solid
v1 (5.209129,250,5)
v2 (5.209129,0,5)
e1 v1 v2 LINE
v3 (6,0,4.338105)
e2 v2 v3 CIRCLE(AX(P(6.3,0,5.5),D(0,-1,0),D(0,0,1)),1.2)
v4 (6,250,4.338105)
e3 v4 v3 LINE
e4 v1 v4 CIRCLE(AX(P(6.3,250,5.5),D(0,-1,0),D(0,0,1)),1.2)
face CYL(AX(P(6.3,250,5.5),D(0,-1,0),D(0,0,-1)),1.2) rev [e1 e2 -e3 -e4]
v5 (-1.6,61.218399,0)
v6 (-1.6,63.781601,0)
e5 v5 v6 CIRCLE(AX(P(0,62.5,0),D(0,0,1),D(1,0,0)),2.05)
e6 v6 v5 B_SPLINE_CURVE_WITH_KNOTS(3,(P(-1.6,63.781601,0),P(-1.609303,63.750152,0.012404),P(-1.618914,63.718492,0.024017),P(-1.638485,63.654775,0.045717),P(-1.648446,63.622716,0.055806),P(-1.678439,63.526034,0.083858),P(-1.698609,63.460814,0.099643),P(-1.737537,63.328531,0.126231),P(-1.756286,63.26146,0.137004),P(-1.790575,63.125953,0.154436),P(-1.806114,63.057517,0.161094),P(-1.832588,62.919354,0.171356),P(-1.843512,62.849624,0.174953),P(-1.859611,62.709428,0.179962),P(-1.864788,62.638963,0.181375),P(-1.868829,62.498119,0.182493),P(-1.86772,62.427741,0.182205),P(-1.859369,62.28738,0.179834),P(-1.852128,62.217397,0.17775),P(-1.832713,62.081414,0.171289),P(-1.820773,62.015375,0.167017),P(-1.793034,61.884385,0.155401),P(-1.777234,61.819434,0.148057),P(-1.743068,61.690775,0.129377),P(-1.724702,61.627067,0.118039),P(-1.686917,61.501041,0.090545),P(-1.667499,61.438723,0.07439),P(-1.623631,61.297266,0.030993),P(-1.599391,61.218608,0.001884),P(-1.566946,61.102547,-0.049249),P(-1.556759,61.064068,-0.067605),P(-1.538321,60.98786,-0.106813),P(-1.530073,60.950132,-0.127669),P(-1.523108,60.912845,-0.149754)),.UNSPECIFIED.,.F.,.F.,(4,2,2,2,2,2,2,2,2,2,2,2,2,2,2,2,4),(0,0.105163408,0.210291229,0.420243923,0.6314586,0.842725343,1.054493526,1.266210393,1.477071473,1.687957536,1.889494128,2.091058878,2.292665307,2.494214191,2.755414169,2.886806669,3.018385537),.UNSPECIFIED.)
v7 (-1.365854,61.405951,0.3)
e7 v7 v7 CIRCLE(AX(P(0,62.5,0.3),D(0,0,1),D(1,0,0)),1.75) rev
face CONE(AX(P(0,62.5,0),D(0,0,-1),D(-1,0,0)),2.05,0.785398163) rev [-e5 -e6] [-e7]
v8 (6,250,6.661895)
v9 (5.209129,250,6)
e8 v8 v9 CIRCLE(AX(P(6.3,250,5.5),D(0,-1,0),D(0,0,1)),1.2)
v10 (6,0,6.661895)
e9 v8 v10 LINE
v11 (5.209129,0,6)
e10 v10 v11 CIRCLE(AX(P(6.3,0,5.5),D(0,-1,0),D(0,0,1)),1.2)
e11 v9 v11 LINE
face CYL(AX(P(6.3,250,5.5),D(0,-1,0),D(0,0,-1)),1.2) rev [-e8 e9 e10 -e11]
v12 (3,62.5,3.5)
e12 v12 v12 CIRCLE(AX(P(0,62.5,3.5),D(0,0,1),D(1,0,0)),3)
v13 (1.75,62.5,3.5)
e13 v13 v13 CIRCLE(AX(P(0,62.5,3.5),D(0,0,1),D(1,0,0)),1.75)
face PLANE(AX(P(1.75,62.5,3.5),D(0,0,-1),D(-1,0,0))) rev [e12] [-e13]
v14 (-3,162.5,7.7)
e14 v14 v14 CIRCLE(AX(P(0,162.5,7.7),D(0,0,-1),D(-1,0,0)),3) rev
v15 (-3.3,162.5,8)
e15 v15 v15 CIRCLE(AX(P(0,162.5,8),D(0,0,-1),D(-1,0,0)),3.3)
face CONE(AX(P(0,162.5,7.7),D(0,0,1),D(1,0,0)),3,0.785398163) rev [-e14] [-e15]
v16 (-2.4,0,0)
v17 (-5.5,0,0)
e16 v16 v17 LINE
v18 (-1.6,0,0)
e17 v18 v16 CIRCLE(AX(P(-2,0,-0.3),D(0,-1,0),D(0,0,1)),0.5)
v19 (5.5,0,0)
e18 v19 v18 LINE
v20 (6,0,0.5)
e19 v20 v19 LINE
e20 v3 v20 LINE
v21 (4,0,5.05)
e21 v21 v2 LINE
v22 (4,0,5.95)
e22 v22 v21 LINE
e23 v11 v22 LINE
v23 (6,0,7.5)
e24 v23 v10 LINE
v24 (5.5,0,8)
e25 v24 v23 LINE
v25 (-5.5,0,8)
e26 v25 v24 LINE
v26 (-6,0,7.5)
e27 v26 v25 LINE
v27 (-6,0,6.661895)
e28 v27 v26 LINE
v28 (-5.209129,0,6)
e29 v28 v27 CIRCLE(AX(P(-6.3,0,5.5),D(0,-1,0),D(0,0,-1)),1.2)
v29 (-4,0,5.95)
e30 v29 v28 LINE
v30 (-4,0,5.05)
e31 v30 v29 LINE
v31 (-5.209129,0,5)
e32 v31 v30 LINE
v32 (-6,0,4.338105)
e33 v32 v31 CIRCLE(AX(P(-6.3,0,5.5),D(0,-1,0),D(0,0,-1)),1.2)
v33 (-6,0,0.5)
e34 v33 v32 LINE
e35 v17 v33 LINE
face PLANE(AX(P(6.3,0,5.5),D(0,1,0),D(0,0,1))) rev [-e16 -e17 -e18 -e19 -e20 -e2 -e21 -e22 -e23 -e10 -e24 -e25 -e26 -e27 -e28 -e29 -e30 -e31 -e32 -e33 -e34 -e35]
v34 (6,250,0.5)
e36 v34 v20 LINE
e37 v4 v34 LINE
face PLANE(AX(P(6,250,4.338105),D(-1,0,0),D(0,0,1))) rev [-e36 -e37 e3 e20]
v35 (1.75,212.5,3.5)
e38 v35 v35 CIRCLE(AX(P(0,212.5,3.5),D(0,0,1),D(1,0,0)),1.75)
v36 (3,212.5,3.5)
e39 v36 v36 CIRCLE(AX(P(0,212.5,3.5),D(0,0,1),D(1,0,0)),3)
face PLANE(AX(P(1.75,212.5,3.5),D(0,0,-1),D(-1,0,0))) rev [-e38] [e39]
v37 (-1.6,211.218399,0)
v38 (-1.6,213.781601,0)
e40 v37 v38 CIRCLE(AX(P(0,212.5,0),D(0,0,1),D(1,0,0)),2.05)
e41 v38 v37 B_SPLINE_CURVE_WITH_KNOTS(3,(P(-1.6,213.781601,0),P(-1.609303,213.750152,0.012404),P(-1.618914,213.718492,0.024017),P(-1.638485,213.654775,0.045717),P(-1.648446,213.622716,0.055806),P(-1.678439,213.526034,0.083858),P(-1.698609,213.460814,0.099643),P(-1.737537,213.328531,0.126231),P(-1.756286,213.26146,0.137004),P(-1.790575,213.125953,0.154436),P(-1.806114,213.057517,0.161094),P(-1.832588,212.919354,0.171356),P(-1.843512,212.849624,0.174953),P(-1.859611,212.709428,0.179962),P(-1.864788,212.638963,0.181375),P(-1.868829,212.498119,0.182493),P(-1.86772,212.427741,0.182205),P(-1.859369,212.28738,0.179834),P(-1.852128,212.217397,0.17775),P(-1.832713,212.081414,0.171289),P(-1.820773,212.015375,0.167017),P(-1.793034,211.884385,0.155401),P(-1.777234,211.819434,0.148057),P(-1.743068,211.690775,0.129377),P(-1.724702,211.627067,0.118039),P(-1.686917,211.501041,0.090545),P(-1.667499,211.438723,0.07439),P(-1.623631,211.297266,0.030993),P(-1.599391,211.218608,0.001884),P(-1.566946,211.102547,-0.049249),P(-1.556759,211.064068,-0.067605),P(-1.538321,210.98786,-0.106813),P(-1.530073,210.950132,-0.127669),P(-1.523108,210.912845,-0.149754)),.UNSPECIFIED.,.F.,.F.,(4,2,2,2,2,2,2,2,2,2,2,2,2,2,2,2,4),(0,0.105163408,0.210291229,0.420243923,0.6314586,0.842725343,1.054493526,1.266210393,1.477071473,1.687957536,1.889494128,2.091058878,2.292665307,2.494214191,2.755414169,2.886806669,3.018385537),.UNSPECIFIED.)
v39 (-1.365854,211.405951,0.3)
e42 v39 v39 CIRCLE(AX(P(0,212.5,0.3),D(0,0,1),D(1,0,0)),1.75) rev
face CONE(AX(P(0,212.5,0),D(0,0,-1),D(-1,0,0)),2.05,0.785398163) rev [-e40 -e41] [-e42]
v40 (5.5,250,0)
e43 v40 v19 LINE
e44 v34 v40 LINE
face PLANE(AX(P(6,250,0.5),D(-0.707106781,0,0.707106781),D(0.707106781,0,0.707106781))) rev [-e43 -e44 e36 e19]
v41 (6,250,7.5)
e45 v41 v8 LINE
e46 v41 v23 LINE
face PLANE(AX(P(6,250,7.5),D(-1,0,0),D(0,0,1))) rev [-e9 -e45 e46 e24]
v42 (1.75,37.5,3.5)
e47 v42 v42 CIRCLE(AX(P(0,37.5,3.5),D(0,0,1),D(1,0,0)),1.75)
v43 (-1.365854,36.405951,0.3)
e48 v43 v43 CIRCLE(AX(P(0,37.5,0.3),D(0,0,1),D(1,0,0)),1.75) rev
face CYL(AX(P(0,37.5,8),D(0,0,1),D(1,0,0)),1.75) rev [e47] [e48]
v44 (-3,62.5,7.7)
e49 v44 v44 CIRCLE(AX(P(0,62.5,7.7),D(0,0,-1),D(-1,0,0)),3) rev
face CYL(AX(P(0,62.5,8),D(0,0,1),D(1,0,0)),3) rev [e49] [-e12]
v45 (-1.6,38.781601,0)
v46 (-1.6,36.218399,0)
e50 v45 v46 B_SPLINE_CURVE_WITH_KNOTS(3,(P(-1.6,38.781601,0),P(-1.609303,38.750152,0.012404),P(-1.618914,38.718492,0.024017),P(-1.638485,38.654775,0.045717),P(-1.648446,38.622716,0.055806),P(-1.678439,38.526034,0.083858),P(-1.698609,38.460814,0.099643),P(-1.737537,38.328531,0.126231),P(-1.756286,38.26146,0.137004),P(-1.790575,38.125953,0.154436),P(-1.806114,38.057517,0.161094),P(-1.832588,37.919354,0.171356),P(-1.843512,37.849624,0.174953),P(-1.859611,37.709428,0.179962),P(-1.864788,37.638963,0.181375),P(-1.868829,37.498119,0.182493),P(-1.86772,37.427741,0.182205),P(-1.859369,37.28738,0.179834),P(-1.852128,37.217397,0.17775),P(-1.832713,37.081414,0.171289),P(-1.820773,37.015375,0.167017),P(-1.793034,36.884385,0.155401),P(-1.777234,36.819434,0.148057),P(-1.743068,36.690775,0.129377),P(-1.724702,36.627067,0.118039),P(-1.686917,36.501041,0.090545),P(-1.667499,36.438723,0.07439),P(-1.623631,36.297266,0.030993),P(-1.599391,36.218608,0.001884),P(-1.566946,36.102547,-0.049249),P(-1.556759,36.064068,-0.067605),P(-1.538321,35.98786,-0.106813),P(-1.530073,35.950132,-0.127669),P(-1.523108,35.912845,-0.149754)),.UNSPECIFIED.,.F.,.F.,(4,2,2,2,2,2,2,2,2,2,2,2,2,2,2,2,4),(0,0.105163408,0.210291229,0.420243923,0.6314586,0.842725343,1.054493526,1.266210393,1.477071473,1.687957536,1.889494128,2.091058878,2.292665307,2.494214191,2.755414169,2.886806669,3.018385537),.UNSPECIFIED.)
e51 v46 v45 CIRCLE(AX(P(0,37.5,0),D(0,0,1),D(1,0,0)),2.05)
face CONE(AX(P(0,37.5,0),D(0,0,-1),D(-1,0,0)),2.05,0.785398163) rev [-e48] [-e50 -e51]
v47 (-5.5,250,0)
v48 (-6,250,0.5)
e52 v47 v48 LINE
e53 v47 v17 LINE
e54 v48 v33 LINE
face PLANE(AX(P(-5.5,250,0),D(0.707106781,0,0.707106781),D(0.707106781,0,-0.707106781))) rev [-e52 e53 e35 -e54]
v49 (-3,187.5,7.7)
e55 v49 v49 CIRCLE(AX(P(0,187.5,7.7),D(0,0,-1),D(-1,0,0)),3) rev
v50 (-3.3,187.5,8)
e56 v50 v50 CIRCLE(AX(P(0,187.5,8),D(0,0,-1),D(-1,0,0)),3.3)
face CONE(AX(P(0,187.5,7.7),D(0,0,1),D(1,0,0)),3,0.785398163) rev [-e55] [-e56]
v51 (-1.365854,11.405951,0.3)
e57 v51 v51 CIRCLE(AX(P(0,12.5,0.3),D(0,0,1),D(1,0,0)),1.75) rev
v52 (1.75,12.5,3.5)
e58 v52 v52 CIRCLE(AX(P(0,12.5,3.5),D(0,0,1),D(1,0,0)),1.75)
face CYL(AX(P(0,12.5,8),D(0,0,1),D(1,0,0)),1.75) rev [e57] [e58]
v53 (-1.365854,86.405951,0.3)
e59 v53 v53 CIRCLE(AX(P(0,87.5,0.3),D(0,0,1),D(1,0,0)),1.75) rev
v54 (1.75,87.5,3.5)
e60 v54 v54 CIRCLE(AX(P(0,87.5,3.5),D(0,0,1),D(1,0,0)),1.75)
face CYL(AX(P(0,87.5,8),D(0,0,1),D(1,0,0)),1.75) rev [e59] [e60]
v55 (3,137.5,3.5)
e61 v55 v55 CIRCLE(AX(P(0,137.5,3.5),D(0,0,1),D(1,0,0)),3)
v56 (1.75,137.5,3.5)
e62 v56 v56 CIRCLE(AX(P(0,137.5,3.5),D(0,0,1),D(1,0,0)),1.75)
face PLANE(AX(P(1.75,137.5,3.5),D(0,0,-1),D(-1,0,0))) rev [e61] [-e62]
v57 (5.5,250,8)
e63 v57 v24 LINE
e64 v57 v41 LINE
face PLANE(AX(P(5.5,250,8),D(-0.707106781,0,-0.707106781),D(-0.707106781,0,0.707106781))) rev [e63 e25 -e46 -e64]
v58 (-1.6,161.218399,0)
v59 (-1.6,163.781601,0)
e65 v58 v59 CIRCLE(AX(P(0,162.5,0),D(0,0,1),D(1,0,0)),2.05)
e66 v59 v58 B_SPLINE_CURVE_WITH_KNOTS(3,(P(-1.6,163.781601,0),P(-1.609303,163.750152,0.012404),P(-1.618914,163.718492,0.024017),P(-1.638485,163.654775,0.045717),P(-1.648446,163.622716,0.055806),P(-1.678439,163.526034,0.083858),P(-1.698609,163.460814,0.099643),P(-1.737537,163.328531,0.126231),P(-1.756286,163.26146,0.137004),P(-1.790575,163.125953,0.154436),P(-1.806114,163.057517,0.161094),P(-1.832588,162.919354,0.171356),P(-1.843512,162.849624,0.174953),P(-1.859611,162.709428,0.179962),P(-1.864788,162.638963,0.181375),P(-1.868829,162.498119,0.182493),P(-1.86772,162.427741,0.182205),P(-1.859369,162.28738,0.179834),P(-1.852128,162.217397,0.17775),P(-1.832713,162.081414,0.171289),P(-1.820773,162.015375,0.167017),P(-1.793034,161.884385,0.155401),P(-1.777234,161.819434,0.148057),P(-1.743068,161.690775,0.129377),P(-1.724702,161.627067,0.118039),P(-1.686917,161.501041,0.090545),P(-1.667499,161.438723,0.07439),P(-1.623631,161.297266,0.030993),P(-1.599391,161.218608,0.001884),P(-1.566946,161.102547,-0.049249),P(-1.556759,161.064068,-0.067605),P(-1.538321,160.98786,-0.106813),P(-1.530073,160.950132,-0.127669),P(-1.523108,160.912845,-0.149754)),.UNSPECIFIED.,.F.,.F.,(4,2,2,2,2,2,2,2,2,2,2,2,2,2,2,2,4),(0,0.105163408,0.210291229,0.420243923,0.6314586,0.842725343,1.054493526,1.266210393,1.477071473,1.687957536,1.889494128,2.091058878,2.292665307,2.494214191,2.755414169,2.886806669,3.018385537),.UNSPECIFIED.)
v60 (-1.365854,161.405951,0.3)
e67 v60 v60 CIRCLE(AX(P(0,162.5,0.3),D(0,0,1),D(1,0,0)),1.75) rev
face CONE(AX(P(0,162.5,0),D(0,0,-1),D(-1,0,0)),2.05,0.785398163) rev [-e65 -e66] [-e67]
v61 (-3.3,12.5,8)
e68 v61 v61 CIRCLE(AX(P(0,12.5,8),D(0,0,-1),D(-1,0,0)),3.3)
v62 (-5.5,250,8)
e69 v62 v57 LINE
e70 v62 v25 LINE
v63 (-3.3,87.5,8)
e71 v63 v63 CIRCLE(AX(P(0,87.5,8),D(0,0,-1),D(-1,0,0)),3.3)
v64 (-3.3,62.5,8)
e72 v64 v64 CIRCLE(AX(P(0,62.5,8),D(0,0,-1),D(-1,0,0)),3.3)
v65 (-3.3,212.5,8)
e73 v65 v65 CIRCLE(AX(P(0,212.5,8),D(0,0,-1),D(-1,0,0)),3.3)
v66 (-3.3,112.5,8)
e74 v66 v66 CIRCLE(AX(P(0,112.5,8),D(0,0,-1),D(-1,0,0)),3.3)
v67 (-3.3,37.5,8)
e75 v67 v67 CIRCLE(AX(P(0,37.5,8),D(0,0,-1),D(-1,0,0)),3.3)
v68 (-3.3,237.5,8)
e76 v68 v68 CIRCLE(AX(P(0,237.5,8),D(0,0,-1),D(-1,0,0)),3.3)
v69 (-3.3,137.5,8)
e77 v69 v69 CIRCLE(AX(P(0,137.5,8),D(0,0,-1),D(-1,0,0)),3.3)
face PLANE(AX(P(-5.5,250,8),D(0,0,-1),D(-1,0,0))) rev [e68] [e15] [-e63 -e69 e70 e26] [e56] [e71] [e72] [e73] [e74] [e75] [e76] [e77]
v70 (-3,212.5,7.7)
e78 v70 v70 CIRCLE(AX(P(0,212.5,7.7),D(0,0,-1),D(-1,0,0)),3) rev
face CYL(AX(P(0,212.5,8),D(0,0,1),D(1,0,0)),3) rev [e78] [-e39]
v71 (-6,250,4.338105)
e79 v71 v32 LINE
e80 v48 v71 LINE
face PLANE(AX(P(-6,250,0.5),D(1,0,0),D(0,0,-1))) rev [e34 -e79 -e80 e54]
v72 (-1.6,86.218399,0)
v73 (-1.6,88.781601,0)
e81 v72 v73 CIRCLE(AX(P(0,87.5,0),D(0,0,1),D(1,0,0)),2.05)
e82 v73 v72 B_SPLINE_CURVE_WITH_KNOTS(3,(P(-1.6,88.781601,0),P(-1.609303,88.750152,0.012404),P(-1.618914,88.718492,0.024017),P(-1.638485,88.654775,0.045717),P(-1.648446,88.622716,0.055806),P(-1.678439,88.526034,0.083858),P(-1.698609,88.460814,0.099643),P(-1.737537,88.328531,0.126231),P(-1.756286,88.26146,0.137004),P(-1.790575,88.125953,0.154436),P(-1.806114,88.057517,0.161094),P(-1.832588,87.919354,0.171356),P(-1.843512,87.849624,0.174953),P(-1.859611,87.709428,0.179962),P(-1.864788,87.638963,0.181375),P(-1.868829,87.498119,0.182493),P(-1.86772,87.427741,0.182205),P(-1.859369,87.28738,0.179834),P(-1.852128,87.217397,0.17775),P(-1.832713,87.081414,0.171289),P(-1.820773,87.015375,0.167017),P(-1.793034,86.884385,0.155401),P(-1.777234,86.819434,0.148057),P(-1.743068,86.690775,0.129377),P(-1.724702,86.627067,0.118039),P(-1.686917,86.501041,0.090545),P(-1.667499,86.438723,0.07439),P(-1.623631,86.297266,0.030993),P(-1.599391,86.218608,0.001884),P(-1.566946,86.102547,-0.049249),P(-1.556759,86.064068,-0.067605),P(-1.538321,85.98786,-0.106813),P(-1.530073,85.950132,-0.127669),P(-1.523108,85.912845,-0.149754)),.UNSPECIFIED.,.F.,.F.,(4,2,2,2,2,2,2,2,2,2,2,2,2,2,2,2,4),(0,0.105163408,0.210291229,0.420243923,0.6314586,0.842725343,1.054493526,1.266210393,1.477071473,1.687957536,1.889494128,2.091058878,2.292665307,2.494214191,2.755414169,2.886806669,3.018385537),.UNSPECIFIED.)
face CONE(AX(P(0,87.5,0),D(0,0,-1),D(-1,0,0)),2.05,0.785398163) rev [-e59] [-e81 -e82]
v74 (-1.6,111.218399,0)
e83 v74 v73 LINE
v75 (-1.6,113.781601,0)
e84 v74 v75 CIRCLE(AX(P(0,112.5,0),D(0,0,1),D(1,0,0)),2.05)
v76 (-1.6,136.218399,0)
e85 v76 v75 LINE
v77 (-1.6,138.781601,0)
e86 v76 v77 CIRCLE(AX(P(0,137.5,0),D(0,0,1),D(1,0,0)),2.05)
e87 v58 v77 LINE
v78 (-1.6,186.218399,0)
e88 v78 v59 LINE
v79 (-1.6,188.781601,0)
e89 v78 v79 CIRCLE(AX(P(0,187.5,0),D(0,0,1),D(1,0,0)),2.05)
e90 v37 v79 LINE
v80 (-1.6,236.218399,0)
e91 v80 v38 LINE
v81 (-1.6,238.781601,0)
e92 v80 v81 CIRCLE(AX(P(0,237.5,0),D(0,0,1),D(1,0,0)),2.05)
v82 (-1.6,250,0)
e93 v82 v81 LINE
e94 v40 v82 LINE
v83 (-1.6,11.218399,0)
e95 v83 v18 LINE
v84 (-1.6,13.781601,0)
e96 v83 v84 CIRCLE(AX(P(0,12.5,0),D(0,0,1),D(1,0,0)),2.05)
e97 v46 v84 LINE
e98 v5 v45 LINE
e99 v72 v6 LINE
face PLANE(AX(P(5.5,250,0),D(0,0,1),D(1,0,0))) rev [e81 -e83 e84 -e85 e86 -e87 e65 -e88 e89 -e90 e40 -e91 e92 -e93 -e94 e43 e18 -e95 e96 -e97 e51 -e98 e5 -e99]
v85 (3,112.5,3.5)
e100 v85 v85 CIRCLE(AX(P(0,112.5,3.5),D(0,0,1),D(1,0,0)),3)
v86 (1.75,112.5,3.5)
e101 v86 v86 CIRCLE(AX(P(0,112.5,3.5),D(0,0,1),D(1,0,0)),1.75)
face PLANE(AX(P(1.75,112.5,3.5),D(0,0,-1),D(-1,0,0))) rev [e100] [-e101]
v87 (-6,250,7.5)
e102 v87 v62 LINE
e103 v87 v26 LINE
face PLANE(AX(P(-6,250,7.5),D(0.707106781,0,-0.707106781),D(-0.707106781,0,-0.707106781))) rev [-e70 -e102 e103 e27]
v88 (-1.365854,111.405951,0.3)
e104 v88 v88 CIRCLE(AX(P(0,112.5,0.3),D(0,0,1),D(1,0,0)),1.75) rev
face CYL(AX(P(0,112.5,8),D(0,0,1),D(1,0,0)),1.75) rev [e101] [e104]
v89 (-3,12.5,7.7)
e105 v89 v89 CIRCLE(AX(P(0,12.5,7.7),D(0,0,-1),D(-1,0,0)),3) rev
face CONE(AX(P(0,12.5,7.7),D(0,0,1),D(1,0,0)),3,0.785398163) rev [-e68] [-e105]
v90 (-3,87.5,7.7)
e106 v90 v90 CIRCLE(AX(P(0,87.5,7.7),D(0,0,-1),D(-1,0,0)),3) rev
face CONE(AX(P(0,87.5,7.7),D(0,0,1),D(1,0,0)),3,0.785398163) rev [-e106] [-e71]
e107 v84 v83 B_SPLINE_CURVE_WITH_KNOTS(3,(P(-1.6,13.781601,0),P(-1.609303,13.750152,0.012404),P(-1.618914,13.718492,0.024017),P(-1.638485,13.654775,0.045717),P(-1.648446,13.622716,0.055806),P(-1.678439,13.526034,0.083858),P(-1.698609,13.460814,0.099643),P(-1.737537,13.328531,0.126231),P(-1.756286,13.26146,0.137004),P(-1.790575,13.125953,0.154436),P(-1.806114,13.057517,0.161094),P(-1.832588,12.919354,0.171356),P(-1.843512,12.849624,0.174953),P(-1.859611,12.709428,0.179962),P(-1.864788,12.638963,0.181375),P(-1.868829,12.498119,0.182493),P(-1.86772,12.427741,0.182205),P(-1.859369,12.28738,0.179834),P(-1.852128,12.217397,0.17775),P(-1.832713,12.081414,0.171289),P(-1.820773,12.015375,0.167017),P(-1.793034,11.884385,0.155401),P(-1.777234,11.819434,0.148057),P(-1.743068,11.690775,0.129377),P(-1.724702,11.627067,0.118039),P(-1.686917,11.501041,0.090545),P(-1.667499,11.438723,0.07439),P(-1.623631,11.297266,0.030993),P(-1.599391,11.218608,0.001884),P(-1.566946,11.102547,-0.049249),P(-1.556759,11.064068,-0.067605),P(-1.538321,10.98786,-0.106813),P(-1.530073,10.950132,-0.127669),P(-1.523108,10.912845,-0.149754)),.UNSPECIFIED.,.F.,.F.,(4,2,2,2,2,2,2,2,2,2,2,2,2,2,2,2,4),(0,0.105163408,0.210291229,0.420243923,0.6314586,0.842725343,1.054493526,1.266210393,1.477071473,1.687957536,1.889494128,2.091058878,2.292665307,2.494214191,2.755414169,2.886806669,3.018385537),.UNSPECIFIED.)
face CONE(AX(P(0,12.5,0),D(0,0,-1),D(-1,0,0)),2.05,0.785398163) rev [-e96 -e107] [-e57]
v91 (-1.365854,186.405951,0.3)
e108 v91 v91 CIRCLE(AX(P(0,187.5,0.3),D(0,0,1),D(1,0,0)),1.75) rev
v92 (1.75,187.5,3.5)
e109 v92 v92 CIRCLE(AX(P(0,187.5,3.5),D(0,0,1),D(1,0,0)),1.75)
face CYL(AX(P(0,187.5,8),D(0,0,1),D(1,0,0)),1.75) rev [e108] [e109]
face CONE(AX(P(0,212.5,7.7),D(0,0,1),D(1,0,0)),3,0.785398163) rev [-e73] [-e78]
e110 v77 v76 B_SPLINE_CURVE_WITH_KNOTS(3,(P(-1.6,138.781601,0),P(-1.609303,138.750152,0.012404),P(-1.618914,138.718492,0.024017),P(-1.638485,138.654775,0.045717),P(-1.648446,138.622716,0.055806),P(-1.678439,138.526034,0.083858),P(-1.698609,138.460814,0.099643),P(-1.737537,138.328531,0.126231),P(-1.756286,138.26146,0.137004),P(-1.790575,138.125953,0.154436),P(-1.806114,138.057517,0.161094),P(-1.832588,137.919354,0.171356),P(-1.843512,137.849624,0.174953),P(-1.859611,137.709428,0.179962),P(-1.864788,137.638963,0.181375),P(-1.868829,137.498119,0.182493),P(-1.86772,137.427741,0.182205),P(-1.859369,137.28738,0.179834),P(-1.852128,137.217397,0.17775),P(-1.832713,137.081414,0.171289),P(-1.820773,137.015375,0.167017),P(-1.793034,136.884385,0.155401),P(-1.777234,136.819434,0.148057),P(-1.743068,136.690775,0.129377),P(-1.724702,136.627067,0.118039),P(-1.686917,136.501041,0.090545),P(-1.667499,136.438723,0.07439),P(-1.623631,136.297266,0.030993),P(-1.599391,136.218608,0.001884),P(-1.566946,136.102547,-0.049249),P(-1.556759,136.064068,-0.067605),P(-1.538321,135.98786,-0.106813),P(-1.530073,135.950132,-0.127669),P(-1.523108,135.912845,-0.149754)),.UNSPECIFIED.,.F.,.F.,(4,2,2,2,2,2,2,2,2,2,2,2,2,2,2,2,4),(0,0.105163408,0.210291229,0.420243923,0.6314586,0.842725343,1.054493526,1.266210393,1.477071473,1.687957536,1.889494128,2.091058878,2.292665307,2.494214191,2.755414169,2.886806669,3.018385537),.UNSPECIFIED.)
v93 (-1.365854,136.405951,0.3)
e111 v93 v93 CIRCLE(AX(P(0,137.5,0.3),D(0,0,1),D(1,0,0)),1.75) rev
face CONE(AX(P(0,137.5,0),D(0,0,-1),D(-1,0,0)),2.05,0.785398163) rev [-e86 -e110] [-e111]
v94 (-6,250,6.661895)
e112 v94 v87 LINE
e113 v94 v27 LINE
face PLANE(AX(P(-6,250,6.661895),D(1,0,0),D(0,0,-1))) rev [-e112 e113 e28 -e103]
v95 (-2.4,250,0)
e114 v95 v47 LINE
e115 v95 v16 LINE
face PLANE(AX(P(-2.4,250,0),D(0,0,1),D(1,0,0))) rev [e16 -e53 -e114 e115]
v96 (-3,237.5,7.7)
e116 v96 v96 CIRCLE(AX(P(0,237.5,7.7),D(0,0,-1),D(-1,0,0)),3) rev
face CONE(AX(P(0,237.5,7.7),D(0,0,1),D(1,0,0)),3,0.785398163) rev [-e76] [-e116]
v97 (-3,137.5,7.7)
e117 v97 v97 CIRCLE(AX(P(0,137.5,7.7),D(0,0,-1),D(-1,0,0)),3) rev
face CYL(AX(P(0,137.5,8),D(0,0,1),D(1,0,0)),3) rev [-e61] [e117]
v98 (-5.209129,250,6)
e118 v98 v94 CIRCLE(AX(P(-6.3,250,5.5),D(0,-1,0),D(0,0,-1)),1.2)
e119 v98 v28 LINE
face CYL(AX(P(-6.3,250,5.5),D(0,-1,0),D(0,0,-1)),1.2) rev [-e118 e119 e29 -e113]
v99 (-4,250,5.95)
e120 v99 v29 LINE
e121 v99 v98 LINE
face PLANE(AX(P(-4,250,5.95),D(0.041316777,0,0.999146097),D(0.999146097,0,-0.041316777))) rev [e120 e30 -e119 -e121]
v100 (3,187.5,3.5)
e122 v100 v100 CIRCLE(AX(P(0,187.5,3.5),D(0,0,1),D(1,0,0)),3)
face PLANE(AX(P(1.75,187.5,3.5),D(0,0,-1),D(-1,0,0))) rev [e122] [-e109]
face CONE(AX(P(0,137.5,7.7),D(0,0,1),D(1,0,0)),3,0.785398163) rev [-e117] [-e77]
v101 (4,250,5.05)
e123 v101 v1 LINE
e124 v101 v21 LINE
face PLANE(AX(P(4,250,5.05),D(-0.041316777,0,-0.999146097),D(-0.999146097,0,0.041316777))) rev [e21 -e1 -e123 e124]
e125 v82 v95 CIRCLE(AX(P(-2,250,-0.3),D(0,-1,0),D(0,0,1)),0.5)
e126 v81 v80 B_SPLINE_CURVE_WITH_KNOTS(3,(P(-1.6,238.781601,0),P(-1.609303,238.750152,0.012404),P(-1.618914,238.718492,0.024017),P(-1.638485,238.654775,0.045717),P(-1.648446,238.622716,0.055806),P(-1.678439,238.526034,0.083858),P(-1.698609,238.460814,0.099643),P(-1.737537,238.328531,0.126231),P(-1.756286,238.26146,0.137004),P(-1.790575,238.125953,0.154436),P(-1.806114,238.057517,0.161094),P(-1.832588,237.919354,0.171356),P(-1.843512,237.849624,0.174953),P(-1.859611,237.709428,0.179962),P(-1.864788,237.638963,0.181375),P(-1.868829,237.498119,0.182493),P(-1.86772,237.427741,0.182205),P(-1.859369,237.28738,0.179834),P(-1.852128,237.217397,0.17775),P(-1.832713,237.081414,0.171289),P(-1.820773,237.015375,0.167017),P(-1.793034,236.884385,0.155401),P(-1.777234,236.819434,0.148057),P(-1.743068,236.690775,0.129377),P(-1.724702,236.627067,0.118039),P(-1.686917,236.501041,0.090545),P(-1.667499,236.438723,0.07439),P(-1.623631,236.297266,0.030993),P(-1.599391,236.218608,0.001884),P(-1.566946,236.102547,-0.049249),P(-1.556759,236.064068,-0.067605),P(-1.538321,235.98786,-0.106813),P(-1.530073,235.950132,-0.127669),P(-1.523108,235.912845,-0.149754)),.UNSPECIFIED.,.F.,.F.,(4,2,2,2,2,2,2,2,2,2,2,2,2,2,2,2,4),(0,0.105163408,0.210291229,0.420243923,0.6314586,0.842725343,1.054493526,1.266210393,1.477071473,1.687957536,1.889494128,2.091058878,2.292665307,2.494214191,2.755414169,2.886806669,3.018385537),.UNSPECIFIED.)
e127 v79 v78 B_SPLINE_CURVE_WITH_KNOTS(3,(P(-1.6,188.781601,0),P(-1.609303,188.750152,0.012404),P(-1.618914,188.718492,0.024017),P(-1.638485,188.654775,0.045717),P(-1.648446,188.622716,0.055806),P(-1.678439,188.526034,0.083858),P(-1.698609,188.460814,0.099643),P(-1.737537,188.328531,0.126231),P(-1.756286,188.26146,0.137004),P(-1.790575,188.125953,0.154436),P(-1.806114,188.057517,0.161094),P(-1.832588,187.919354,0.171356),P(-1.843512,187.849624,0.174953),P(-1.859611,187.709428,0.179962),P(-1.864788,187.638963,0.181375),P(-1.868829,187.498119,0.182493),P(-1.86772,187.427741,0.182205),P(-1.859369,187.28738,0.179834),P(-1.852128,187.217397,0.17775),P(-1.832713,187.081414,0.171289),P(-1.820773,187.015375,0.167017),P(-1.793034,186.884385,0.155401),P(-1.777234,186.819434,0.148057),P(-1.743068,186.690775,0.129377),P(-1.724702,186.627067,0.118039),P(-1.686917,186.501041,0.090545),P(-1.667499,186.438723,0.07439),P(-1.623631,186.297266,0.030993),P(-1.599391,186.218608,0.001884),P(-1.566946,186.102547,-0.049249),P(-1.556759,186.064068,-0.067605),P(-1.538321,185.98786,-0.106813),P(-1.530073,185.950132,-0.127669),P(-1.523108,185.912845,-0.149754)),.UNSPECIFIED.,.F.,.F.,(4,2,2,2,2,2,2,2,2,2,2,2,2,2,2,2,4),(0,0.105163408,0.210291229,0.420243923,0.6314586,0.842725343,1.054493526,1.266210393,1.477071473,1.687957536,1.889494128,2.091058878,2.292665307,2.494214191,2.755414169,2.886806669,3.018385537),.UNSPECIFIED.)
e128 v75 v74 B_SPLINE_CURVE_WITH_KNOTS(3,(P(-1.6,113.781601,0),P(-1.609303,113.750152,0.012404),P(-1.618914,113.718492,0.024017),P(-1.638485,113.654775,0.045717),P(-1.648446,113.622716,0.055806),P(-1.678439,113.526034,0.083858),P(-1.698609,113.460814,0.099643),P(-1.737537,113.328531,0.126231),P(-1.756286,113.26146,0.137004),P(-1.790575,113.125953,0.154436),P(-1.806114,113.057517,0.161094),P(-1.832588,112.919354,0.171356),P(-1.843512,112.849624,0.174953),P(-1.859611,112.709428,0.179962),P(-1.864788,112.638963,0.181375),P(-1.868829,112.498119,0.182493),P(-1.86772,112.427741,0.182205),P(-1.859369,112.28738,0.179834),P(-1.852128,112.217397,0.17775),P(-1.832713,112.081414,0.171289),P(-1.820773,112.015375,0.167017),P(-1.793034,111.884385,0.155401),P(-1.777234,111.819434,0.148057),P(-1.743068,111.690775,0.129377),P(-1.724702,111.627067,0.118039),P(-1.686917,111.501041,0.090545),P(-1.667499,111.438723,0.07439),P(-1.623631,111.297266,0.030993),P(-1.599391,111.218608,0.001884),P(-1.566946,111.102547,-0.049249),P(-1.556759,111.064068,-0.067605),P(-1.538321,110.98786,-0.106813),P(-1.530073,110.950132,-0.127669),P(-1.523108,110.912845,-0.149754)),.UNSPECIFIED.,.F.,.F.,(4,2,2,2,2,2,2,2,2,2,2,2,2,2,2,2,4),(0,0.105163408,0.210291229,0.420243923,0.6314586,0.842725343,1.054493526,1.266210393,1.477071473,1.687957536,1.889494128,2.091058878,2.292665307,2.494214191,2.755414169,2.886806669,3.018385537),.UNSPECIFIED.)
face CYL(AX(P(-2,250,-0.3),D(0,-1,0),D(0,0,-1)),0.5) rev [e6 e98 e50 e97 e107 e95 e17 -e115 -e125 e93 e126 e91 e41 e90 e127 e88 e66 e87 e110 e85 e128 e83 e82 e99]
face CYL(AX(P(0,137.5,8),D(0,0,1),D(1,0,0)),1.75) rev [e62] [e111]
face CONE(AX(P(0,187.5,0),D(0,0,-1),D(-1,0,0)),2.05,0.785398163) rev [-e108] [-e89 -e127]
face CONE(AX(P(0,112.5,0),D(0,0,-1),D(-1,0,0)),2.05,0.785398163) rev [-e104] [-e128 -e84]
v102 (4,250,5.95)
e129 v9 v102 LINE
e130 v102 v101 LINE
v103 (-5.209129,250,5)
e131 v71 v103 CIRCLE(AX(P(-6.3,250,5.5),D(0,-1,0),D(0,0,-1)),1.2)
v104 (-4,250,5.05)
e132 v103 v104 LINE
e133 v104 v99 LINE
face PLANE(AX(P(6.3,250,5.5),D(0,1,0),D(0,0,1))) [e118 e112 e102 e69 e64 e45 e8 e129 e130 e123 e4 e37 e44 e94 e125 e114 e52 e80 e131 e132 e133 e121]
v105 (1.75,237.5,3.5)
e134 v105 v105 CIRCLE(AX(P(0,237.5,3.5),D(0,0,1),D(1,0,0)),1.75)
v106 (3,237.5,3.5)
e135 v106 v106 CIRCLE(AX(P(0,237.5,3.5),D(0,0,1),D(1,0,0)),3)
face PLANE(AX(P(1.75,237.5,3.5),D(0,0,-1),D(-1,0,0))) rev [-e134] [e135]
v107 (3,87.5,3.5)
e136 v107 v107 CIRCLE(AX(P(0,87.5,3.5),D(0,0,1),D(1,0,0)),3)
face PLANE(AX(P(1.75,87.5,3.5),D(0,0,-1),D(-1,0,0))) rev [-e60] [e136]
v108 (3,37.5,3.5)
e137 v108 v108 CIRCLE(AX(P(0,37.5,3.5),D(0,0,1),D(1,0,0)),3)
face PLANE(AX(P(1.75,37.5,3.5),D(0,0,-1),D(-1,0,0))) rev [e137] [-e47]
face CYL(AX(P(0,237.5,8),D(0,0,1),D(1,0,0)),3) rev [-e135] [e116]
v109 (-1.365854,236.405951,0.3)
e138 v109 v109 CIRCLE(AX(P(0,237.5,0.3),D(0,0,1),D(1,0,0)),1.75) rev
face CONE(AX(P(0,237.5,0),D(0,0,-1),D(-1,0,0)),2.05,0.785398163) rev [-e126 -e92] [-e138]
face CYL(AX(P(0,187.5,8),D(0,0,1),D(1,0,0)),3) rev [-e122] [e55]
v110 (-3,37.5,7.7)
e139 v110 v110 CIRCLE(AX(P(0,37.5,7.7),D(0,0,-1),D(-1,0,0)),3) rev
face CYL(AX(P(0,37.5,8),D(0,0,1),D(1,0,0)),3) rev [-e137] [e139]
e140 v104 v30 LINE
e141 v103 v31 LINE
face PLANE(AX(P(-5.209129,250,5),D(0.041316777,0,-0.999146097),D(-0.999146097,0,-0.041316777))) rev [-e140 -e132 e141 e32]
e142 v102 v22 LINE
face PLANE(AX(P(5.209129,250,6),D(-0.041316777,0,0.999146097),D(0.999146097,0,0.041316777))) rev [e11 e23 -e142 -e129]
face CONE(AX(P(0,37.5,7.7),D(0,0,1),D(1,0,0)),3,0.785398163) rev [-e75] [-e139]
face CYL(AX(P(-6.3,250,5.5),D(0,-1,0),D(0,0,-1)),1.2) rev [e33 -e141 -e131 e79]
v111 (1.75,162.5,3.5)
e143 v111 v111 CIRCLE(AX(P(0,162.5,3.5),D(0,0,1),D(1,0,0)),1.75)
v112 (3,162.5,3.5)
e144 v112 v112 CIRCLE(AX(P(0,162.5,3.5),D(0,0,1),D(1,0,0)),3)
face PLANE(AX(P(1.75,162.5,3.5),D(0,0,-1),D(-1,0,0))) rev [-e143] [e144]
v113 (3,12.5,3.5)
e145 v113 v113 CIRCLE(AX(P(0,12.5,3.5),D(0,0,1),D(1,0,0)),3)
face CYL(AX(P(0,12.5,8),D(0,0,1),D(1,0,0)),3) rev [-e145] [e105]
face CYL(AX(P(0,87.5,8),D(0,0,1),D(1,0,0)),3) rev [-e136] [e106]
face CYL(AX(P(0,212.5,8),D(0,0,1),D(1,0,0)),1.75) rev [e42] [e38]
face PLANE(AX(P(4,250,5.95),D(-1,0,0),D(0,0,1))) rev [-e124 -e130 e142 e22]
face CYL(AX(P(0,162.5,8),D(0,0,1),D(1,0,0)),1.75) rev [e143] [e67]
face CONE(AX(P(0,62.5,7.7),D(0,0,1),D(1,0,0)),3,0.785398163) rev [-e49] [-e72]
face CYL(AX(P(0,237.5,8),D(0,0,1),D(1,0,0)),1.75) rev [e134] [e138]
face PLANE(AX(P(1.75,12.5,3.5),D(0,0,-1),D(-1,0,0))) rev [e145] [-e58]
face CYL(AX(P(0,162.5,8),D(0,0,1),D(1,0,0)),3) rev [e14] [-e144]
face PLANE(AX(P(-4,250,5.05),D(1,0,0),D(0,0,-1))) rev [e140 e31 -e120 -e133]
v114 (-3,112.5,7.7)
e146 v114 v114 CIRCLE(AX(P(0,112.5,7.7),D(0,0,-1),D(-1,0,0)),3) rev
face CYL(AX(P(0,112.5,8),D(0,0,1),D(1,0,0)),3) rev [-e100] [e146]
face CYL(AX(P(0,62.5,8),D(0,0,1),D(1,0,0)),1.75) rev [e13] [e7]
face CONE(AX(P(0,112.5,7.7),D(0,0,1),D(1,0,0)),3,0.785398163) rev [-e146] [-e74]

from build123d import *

# Parameters (mm, degrees)
DELKA_DEPTH       = 250
D_RA1_D           = 3.5
D_RA1_CBORE_D     = 6
D_RA1_CBORE_DEPTH = 4.5
LINPOLE1_COUNT    = 10
LINPOLE1_PITCH    = 25


with BuildPart() as part:
    # Skica1 → Delka (new body)
    with BuildSketch(Plane(origin=(0, 0, 0), x_dir=(1, 0, 0), z_dir=(0, 1, 0))):
        with BuildLine():
            Line((-5.5, -8), (5.5, -8))
            Line((5.5, -8), (6, -7.5))
            Line((6, -7.5), (6, -6.661895004))
            ThreePointArc((6, -6.661895004), (5.52983318, -6.420240767), (5.209128789, -6))
            Line((5.209128789, -6), (4, -5.95))
            Line((4, -5.95), (4, -5.05))
            Line((4, -5.05), (5.209128789, -5))
            ThreePointArc((5.209128789, -5), (5.52983318, -4.579759233), (6, -4.338104996))
            Line((6, -4.338104996), (6, -0.5))
            Line((6, -0.5), (5.5, 0))
            Line((5.5, 0), (-1.6, 0))
            ThreePointArc((-1.6, 0), (-2, -0.2), (-2.4, 0))
            Line((-2.4, 0), (-5.5, 0))
            Line((-5.5, 0), (-6, -0.5))
            Line((-6, -0.5), (-6, -4.338104996))
            ThreePointArc((-6, -4.338104996), (-5.52983318, -4.579759233), (-5.209128789, -5))
            Line((-5.209128789, -5), (-4, -5.05))
            Line((-4, -5.05), (-4, -5.95))
            Line((-4, -5.95), (-5.209128789, -6))
            ThreePointArc((-5.209128789, -6), (-5.52983318, -6.420240767), (-6, -6.661895004))
            Line((-6, -6.661895004), (-6, -7.5))
            Line((-6, -7.5), (-5.5, -8))
        make_face()
    extrude(amount=DELKA_DEPTH)

    # Díra1 (through all)
    with Locations(Plane.XY.offset(8)):
        with Locations((0, 12.5)):
            d_ra1 = CounterBoreHole(D_RA1_D / 2, D_RA1_CBORE_D / 2, D_RA1_CBORE_DEPTH)

    # Zkosení1: read off the stored shape, not the designer's step
    # Zkosení1 outline → Zkosení1 (revolve, cut)
    with BuildSketch(Plane.XZ.offset(-12.5)):
        Polygon((2.050001495, -1.495e-06), (1.75, 0.3), (1.75, -1.495e-06), align=None)
        Polygon((3, 8), (3, 7.7), (3.3, 8), align=None)
    zkosen_1 = revolve(axis=Axis((0, 12.5, 0), (0, 0, 1)), mode=Mode.SUBTRACT)

    # LinPole1: Díra1, Zkosení1 ×10
    with Locations(*[(0, i * LINPOLE1_PITCH, 0) for i in range(1, LINPOLE1_COUNT)]):
        add(d_ra1, mode=Mode.SUBTRACT)
        add(zkosen_1, mode=Mode.SUBTRACT)


solid = part.part
